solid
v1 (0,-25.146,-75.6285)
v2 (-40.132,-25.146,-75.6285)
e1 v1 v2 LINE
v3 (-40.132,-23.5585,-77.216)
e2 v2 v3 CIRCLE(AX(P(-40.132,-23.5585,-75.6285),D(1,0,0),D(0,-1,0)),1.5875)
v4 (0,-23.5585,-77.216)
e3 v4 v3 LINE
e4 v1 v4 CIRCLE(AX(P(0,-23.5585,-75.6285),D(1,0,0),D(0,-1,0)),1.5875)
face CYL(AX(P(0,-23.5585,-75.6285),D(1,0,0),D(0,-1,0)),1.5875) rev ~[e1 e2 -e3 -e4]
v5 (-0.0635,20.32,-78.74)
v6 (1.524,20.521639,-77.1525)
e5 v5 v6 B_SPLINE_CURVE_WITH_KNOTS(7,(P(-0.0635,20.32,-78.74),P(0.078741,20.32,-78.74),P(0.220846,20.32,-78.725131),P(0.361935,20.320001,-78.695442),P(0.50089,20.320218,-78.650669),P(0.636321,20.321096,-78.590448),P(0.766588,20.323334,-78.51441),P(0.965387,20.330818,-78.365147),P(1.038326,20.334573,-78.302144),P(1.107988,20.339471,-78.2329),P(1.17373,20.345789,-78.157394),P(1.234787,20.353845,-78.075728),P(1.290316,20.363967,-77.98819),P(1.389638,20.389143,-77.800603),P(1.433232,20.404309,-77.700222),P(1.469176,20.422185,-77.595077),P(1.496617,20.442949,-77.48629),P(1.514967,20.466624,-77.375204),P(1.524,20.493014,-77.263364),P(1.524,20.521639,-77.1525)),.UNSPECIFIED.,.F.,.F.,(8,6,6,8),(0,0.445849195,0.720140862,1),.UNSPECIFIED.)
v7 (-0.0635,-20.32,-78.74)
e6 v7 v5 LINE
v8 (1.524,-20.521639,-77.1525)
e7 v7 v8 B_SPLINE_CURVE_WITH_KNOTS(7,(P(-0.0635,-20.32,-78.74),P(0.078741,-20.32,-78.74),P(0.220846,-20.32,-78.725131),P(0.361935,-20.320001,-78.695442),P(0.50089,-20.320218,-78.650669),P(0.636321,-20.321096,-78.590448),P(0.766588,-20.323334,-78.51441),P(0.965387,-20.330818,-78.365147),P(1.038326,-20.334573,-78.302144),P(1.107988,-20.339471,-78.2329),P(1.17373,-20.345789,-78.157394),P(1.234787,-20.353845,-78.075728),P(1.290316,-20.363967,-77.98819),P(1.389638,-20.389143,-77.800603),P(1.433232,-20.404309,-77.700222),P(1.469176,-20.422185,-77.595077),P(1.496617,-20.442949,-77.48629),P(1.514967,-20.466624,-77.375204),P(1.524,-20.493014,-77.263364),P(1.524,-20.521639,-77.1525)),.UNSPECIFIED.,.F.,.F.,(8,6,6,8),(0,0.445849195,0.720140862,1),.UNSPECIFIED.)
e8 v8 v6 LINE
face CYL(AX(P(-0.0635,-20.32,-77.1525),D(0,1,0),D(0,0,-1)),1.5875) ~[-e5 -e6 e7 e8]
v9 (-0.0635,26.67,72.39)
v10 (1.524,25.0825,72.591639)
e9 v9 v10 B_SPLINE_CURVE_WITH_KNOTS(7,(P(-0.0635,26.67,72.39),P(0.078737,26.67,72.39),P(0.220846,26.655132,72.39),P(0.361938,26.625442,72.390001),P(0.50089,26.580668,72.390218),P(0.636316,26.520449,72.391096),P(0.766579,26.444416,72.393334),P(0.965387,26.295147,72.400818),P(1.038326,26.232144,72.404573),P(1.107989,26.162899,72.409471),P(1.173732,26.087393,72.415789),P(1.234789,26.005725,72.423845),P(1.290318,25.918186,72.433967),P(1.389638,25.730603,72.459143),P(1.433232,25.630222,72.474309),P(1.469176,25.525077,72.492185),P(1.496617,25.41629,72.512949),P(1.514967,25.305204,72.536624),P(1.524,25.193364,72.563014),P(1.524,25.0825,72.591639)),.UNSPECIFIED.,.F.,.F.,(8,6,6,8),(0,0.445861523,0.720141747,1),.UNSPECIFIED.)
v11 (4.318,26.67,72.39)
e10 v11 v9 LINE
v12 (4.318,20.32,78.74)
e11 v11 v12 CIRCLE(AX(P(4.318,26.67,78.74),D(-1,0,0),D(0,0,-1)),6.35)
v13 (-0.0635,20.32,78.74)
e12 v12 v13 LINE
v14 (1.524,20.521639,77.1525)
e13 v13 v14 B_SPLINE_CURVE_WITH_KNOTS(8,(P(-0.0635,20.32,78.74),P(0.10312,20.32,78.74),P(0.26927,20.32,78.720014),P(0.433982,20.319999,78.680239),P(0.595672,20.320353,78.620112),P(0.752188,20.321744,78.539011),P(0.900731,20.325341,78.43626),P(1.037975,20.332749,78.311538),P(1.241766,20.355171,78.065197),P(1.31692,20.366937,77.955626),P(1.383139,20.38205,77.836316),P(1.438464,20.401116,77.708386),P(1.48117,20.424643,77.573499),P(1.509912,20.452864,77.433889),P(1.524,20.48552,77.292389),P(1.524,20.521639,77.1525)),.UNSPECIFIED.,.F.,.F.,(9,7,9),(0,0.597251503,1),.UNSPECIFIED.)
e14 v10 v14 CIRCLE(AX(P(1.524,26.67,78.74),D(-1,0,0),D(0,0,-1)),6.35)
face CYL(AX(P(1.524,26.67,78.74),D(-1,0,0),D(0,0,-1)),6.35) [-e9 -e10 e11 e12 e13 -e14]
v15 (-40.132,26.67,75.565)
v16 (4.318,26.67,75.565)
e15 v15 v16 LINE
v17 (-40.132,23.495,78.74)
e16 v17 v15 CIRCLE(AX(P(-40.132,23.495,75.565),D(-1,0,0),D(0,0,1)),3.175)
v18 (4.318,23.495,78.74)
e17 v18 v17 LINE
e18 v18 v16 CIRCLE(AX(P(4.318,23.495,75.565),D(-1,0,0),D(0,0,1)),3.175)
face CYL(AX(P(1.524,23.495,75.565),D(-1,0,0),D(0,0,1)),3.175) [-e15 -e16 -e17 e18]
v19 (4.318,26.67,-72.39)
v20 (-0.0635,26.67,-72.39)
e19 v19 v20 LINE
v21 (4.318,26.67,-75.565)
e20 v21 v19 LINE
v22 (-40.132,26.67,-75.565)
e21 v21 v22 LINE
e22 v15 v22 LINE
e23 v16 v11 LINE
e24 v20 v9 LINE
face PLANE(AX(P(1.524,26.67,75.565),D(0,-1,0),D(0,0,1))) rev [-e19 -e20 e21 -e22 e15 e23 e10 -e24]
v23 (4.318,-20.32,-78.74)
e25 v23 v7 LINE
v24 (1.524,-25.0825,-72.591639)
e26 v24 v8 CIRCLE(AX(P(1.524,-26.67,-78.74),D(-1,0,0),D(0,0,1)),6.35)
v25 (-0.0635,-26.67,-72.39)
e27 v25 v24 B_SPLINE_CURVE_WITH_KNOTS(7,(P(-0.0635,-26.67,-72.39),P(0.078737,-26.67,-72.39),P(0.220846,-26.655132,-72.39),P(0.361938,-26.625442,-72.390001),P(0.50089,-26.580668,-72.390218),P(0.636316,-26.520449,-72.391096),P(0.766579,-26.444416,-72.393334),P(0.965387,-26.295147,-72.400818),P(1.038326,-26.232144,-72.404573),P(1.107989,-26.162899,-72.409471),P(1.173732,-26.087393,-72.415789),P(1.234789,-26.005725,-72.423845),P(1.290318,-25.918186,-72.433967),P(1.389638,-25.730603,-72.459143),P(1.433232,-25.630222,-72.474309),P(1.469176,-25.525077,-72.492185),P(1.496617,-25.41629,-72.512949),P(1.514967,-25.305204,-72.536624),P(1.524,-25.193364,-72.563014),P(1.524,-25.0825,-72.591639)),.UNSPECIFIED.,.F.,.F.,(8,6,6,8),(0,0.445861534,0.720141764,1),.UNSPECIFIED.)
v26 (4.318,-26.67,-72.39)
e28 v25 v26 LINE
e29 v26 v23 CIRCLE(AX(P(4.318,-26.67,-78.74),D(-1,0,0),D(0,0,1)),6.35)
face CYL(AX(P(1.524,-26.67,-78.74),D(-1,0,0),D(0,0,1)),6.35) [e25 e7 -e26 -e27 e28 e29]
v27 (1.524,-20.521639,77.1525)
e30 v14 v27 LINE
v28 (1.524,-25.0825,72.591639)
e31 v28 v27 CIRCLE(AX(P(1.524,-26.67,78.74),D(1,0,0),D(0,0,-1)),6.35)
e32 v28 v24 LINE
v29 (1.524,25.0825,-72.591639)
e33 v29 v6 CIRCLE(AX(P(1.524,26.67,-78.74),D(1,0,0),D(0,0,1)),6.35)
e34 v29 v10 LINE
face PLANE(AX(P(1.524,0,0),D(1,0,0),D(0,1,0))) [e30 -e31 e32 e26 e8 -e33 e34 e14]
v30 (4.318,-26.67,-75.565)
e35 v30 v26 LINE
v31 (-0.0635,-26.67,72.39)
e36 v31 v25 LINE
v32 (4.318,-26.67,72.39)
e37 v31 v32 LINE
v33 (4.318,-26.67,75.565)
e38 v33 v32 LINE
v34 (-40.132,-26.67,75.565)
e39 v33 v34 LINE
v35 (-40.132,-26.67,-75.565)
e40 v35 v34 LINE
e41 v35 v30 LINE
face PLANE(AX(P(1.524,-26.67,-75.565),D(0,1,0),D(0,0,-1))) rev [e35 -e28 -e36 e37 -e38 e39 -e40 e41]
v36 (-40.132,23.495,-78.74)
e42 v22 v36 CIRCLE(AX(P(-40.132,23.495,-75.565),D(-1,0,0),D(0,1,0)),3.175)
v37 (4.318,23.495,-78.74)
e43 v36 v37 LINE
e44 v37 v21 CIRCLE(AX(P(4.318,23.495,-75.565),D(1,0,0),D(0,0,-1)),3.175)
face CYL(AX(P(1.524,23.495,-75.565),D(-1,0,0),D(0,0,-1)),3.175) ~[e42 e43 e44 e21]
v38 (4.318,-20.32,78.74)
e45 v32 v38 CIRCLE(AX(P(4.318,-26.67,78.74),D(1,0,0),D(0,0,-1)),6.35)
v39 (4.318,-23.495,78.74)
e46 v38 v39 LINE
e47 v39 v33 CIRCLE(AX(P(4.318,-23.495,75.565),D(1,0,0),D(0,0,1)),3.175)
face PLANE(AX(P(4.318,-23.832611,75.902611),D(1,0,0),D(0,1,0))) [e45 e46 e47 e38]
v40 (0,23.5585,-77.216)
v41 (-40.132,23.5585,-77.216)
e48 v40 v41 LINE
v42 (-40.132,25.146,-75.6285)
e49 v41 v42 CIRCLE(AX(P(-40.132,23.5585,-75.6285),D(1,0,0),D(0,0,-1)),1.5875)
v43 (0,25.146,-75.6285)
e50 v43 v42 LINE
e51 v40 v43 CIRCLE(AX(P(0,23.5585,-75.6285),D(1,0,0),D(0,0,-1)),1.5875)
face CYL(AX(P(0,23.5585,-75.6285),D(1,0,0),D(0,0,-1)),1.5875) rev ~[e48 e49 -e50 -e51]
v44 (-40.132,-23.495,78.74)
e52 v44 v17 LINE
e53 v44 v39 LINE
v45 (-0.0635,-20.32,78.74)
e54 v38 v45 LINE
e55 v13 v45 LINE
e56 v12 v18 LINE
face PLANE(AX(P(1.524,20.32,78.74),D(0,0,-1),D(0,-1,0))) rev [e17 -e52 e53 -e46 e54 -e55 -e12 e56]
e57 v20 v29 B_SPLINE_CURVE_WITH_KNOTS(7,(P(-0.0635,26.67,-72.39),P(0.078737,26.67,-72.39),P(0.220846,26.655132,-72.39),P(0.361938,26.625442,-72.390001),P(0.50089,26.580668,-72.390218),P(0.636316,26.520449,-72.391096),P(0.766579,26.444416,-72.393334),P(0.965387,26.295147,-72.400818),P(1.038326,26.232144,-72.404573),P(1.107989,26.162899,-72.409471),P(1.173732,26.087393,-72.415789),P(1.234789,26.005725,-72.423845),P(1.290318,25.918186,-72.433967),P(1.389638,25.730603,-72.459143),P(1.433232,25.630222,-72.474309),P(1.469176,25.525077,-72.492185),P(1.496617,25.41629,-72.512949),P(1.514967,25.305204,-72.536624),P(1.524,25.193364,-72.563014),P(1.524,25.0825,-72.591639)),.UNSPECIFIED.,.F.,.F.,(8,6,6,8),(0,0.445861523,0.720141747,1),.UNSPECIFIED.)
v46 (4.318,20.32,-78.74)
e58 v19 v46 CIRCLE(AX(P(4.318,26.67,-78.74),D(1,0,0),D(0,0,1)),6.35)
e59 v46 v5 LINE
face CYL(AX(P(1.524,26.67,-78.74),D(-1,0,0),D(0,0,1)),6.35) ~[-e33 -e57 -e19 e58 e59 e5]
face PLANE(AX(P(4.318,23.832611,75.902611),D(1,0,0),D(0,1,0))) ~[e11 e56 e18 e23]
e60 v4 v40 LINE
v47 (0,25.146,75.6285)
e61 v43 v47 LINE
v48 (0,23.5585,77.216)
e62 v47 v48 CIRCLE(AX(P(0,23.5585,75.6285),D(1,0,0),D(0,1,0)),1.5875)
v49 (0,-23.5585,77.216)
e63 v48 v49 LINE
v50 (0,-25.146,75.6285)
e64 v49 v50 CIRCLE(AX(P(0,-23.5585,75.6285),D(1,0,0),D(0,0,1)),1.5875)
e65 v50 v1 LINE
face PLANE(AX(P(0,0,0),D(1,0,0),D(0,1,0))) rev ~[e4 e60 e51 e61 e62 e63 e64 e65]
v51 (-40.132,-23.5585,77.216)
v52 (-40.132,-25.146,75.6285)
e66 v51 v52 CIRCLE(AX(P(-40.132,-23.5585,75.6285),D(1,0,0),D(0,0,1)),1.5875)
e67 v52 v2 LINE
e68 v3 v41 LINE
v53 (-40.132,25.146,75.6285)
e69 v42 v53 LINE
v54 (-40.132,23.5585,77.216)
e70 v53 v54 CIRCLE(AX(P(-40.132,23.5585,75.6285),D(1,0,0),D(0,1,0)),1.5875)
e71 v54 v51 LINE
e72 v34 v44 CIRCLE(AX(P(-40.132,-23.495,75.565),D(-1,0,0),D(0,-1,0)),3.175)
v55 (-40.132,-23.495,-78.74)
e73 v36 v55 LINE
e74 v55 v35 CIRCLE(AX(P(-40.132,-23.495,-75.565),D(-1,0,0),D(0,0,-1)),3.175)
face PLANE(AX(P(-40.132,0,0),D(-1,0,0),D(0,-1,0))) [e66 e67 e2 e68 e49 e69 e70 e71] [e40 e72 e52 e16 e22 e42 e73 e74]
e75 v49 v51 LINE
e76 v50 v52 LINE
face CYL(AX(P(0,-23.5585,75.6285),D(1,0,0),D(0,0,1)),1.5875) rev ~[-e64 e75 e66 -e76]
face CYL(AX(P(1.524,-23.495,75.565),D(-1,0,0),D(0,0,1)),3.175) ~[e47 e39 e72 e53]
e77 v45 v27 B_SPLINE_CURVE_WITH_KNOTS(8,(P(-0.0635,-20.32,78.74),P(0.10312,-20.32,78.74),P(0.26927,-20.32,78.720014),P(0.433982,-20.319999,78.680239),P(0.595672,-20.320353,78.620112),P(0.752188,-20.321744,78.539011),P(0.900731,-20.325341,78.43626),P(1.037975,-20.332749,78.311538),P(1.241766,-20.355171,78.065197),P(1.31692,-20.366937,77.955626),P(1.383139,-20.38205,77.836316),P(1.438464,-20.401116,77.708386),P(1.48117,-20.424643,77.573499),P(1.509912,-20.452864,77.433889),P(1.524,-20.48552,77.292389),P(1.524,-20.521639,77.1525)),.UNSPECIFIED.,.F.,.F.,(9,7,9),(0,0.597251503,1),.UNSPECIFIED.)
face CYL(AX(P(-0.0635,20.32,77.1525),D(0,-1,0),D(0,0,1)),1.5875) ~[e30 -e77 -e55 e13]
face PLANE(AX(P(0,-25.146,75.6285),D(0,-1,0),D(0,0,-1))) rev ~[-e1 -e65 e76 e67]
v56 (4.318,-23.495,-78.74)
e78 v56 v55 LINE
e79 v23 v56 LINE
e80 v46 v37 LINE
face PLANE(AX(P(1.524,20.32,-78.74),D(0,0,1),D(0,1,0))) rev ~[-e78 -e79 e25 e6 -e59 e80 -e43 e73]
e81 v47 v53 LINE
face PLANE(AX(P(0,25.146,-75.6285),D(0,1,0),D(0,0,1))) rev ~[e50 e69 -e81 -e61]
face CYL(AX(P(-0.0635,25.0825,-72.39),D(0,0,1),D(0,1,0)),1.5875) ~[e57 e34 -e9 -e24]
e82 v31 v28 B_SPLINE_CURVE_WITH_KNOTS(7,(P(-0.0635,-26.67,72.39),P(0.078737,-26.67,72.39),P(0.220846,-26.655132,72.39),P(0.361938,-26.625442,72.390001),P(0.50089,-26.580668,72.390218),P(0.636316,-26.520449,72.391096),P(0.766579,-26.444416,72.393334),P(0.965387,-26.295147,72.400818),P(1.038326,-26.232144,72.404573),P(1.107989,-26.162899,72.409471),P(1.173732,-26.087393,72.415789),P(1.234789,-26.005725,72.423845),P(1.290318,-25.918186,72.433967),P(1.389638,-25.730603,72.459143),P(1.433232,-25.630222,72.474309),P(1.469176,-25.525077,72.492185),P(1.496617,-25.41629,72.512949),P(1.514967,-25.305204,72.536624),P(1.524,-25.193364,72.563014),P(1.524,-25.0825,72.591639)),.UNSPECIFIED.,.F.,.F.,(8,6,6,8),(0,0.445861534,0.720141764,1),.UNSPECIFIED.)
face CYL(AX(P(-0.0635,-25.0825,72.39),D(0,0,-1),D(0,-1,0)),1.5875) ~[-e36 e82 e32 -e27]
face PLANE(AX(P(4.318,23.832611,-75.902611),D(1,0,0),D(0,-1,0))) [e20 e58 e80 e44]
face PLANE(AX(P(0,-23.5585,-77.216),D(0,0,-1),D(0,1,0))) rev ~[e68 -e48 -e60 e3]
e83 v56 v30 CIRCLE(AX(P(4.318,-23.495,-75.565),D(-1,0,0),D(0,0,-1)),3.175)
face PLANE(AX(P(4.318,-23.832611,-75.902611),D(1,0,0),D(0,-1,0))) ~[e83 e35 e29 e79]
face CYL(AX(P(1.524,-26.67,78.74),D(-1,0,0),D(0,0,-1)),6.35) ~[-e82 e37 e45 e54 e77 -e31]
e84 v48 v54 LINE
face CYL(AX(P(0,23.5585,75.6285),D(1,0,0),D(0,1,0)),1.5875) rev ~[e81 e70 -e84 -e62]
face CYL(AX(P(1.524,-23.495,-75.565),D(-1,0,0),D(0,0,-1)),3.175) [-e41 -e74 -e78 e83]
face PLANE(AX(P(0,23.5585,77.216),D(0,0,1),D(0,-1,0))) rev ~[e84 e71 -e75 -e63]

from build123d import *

# Parameters (mm, degrees)
F1_DEPTH = 1.524
F3_DEPTH = 40.132
F5_DEPTH = 2.794
F8_R     = 1.5875
F9_R     = 1.5875
F10_R    = 1.5875
F11_R    = 1.5875


with BuildPart() as f1:
    # F0 (on Right) → F1 (new body)
    with BuildSketch(Plane.YZ):
        with BuildLine():
            ThreePointArc((26.67, 75.565), (25.7400640303, 77.8100640303), (23.495, 78.74))
            Line((23.495, 78.74), (-23.495, 78.74))
            ThreePointArc((-23.495, 78.74), (-25.7400640303, 77.8100640303), (-26.67, 75.565))
            Line((-26.67, 75.565), (-26.67, -75.565))
            ThreePointArc((-26.67, -75.565), (-25.7400640303, -77.8100640303), (-23.495, -78.74))
            Line((-23.495, -78.74), (23.495, -78.74))
            ThreePointArc((23.495, -78.74), (25.7400640303, -77.8100640303), (26.67, -75.565))
            Line((26.67, -75.565), (26.67, 75.565))
        make_face()
    extrude(amount=F1_DEPTH)

    # F2 (on face) → F3 (join)
    with BuildSketch(Plane(origin=(0, 0, 0), x_dir=(0, -1, 0), z_dir=(-1, 0, 0))):
        with BuildLine():
            Line((23.495, 78.74), (-23.495, 78.74))
            ThreePointArc((-23.495, 78.74), (-25.7400640303, 77.8100640303), (-26.67, 75.565))
            Line((-26.67, 75.565), (-26.67, -75.565))
            ThreePointArc((-26.67, -75.565), (-25.7400640303, -77.8100640303), (-23.495, -78.74))
            Line((-23.495, -78.74), (23.495, -78.74))
            ThreePointArc((23.495, -78.74), (25.7400640303, -77.8100640303), (26.67, -75.565))
            Line((26.67, -75.565), (26.67, 75.565))
            ThreePointArc((26.67, 75.565), (25.7400640303, 77.8100640303), (23.495, 78.74))
        make_face()
        with BuildLine():
            ThreePointArc((25.146, -75.6285), (24.6810320151, -76.7510320151), (23.5585, -77.216))
            Line((23.5585, -77.216), (-23.5585, -77.216))
            ThreePointArc((-23.5585, -77.216), (-24.6810320151, -76.7510320151), (-25.146, -75.6285))
            Line((-25.146, -75.6285), (-25.146, 75.6285))
            ThreePointArc((-25.146, 75.6285), (-24.6810320151, 76.7510320151), (-23.5585, 77.216))
            Line((-23.5585, 77.216), (23.5585, 77.216))
            ThreePointArc((23.5585, 77.216), (24.6810320151, 76.7510320151), (25.146, 75.6285))
            Line((25.146, 75.6285), (25.146, -75.6285))
        make_face(mode=Mode.SUBTRACT)
    extrude(amount=F3_DEPTH)

    # F4 (on face) → F5 (join)
    with BuildSketch(Plane.YZ.offset(1.524)):
        with BuildLine():
            ThreePointArc((-26.67, 72.39), (-22.1798719395, 74.2498719395), (-20.32, 78.74))
            Line((-20.32, 78.74), (-23.495, 78.74))
            ThreePointArc((-23.495, 78.74), (-25.7400640303, 77.8100640303), (-26.67, 75.565))
            Line((-26.67, 75.565), (-26.67, 72.39))
        make_face()
    extrude(amount=F5_DEPTH)


with BuildPart() as f6_1:
    # F6: instance of F1
    add(f1.part.mirror(Plane.XY))


with BuildPart() as f1_1:
    add(f1.part)

    add(f6_1.part)  # F7 merges F6_1
    # F7: F6_1, F1 across plane
    add(f6_1.part.mirror(Plane.XZ))
    add(f1.part.mirror(Plane.XZ))

    # F8
    f8_edges = [f1_1.edges().sort_by_distance(p)[0] for p in [
        (1.524, -26.67, 0),
    ]]
    fillet(f8_edges, radius=F8_R)

    # F9
    f9_edges = [f1_1.edges().sort_by_distance(p)[0] for p in [
        (1.524, 0, -78.74),
    ]]
    fillet(f9_edges, radius=F9_R)

    # F10
    f10_edges = [f1_1.edges().sort_by_distance(p)[0] for p in [
        (1.524, 26.67, 0),
    ]]
    fillet(f10_edges, radius=F10_R)

    # F11
    f11_edges = [f1_1.edges().sort_by_distance(p)[0] for p in [
        (1.524, 0, 78.74),
    ]]
    fillet(f11_edges, radius=F11_R)


solid = f1_1.part
